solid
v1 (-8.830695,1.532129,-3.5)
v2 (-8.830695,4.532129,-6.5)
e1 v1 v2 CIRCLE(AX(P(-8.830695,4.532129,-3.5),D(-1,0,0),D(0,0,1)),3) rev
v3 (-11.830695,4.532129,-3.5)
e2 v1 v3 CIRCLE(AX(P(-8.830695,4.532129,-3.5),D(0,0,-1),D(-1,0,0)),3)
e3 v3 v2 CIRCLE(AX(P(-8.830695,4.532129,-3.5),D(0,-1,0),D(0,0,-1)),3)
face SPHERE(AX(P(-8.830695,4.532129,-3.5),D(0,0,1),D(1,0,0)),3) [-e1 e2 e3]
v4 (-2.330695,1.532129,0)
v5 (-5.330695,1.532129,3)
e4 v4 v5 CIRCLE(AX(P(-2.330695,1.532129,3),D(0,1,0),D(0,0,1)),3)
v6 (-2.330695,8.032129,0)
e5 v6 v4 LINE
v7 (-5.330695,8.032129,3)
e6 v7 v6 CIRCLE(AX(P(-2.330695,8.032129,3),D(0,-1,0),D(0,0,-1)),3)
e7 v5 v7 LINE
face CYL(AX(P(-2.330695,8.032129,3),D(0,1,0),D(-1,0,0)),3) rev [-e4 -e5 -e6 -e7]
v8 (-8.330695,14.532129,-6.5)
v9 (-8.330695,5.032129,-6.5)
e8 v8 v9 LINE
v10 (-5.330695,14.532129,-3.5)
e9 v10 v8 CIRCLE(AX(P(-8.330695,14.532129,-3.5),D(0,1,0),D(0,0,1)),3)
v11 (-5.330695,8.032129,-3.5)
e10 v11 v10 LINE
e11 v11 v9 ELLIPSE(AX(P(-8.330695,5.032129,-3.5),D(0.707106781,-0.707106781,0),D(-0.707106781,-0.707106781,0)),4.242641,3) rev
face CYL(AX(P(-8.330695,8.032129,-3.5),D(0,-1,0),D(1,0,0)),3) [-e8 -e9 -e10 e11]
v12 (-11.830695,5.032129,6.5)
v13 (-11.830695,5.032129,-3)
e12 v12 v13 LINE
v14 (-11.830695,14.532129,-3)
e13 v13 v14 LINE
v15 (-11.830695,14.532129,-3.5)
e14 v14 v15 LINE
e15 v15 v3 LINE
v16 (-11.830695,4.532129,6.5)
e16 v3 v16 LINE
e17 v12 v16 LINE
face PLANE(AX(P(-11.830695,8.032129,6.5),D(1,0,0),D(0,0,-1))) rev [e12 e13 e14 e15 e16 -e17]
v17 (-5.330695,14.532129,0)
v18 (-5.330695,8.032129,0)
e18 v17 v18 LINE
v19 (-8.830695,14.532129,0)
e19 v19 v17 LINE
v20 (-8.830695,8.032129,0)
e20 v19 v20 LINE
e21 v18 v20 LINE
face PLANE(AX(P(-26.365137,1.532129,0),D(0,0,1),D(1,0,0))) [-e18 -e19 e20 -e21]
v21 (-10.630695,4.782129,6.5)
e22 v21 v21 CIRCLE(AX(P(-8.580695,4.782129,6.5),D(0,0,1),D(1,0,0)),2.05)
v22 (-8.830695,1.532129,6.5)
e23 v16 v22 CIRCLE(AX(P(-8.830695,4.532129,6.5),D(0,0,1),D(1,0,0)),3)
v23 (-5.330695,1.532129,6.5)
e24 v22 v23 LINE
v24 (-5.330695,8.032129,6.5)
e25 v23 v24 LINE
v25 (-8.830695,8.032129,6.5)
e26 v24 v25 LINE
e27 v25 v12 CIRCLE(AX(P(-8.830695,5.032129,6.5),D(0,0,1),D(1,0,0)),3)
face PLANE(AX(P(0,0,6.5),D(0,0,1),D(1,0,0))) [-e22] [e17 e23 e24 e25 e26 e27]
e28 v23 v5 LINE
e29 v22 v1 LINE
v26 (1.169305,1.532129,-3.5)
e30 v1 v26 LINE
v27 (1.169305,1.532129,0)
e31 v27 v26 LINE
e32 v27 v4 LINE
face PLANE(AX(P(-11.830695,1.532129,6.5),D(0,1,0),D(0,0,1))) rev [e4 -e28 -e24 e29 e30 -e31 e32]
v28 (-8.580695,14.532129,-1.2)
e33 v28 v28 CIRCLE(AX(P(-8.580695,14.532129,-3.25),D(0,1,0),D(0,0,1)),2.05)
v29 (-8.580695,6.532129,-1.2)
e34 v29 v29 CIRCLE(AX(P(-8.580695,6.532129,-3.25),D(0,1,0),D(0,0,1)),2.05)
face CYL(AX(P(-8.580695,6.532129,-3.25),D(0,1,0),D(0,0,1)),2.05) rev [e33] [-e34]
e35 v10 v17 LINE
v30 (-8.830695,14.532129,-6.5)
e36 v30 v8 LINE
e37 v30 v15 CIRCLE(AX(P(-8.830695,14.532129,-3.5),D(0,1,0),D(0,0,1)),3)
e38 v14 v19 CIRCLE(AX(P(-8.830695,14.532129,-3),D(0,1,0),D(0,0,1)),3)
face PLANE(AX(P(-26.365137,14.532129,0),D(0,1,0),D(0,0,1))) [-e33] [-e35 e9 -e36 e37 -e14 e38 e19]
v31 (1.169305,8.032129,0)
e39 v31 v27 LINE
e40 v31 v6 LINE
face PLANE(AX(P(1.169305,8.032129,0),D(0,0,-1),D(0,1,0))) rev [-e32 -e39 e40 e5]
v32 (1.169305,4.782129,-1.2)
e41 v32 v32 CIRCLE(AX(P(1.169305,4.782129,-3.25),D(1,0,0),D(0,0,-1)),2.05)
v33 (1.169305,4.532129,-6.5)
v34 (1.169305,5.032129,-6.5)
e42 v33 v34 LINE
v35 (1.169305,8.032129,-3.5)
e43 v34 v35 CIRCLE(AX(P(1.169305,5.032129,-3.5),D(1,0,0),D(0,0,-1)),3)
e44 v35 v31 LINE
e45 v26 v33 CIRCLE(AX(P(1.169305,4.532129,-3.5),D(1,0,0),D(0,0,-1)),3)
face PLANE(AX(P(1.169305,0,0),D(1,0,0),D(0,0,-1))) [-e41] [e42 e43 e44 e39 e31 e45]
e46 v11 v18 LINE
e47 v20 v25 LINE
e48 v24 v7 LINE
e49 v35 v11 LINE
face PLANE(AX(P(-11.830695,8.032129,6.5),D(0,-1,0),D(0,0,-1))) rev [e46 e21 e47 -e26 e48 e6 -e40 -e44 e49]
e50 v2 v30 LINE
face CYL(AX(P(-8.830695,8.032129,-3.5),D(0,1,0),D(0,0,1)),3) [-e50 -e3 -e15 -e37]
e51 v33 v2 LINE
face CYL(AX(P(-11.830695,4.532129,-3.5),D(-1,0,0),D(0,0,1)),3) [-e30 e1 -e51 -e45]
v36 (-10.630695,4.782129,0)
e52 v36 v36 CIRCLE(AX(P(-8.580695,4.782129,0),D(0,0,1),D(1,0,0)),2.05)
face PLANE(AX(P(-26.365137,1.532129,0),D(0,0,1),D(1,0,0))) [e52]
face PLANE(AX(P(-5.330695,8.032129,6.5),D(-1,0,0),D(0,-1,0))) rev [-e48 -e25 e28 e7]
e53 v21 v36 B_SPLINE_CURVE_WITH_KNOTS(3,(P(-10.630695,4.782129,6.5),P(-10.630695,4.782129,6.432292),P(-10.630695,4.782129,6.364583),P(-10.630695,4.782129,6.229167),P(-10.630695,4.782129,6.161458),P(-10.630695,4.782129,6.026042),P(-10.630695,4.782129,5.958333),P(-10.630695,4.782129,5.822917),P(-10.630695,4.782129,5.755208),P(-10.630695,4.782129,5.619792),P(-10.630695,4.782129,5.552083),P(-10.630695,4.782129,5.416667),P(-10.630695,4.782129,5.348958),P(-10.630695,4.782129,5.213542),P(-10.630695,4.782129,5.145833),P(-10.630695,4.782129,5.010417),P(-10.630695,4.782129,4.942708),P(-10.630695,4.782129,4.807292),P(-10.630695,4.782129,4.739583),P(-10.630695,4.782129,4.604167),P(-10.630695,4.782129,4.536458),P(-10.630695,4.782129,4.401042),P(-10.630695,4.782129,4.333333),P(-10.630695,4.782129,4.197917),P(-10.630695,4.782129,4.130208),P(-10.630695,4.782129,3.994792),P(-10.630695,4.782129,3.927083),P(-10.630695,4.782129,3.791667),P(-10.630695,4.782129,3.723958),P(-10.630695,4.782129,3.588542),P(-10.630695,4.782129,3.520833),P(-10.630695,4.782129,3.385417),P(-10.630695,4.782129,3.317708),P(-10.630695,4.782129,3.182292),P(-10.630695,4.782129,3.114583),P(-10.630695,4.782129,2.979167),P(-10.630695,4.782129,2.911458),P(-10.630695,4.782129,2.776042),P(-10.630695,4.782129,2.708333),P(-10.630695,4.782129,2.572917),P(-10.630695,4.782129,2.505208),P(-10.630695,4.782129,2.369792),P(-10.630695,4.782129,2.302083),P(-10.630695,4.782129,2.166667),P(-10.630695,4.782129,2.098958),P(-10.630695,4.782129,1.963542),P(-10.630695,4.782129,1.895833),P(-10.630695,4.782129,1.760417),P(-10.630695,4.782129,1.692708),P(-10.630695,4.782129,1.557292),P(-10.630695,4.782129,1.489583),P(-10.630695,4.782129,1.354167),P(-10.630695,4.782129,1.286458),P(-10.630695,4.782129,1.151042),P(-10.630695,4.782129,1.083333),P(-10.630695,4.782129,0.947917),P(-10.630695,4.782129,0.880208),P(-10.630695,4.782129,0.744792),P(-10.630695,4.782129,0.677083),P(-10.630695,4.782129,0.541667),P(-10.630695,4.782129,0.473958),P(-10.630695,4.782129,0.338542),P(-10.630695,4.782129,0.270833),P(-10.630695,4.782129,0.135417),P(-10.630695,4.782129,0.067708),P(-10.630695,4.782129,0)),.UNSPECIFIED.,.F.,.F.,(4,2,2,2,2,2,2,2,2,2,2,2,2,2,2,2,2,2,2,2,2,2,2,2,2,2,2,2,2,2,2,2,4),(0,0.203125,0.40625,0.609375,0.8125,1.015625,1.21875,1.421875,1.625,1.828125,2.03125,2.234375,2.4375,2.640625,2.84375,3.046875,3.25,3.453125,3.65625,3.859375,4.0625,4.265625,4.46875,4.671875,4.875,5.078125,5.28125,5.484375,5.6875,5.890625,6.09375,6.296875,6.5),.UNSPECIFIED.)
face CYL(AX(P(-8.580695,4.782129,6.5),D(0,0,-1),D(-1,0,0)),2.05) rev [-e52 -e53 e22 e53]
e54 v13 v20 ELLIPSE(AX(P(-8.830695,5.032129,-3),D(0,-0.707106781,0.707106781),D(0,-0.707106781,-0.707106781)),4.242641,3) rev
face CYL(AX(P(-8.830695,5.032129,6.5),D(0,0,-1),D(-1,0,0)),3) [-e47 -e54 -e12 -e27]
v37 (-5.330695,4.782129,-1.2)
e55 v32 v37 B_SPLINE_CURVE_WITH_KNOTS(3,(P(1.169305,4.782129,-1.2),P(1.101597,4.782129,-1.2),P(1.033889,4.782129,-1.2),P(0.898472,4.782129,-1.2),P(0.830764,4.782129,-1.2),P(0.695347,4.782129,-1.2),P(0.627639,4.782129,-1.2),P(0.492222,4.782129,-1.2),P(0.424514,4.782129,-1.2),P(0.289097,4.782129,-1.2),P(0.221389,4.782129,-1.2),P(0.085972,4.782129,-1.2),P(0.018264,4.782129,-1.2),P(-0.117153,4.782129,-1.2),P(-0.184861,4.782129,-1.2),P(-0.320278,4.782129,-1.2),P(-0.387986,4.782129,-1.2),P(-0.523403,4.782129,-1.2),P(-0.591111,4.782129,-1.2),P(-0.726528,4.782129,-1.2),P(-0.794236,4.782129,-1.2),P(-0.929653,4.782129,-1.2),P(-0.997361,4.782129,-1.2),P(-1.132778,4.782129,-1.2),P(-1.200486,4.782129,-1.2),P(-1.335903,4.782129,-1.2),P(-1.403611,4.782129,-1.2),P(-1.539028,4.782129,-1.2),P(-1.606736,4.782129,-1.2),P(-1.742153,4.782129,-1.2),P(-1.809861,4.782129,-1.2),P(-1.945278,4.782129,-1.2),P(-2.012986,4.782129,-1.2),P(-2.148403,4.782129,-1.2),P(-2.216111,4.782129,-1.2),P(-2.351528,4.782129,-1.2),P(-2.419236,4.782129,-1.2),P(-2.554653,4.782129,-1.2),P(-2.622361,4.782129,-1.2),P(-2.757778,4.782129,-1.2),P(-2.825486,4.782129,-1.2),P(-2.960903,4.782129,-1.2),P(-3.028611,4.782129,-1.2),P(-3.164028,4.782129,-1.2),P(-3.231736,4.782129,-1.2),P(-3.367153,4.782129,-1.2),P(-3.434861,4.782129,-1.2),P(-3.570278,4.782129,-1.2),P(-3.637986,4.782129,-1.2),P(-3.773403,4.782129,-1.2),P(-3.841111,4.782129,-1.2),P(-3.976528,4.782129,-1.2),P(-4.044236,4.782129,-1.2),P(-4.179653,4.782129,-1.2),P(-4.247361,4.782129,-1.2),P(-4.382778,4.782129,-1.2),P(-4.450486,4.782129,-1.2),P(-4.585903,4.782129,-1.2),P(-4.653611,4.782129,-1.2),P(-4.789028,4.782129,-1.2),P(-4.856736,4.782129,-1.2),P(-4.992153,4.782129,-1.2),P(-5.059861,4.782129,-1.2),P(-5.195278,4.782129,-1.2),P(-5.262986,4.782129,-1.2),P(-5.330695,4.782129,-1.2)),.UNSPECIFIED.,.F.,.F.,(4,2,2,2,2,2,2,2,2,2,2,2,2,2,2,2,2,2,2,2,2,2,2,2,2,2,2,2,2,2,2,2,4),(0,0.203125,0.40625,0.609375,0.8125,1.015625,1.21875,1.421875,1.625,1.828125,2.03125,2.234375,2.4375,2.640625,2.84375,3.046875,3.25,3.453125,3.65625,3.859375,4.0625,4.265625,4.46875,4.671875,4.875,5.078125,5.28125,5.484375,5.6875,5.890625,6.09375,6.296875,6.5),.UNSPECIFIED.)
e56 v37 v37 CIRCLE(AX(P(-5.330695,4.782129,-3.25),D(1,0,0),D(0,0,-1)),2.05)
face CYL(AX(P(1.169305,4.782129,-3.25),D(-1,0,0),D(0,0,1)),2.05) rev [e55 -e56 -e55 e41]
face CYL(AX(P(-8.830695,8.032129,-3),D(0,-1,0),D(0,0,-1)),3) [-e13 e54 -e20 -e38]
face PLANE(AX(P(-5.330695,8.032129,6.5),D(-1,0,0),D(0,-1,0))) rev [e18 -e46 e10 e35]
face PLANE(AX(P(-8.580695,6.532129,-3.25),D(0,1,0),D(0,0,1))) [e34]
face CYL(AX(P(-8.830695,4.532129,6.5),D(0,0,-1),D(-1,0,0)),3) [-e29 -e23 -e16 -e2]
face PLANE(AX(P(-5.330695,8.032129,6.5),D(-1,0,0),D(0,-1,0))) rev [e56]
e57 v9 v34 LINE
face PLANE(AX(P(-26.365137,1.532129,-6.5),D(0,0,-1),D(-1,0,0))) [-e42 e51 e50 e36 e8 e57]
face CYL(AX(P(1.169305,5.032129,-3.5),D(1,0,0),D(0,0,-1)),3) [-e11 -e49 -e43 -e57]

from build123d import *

# Parameters (mm, degrees)
SKETCH_1_W          = 6.5
SKETCH_1_H          = 6.5
SKETCH_1_R          = 2.05
EXTRUDE_1_DEPTH     = 6.5
SKETCH_2_W          = 6.5
SKETCH_2_H          = 13
EXTRUDE_2_DEPTH     = 6.5
SKETCH_3_W          = 6.5
SKETCH_3_H          = 6.5
SKETCH_3_R          = 2.05
EXTRUDE_3_DEPTH     = 6.5
SKETCH_4_R          = 2.05
CUT_EXTRUDE_1_DEPTH = 8
FILLET_1_R          = 3
FILLET_2_R          = 3


with BuildPart() as part:
    # 草图1 → 凸台-拉伸1 (new body)
    with BuildSketch(Plane.XY):
        with Locations((-8.580694703, 4.782128964)):
            Rectangle(SKETCH_1_W, SKETCH_1_H)
        with Locations(Location((-8.580694703, 4.782128964, 0), (0, 0, 180))):
            Circle(SKETCH_1_R, mode=Mode.SUBTRACT)
    extrude(amount=EXTRUDE_1_DEPTH)

    # 草图2 → 凸台-拉伸2 (add)
    with BuildSketch(Plane(origin=(-5.330694703, 0, 0), x_dir=(0, 0, -1), z_dir=(1, 0, 0))):
        with Locations((3.25, 8.032128964)):
            Rectangle(SKETCH_2_W, SKETCH_2_H)
    extrude(amount=-EXTRUDE_2_DEPTH)

    # 草图3 → 凸台-拉伸3 (add)
    with BuildSketch(Plane(origin=(-5.330694703, 0, 0), x_dir=(0, 0, -1), z_dir=(1, 0, 0))):
        with Locations((3.25, 4.782128964)):
            Rectangle(SKETCH_3_W, SKETCH_3_H)
        with Locations(Location((3.25, 4.782128964, 0), (0, 0, 180))):
            Circle(SKETCH_3_R, mode=Mode.SUBTRACT)
    extrude(amount=EXTRUDE_3_DEPTH)

    # 草图4 → 切除-拉伸1 (cut)
    with BuildSketch(Plane(origin=(0, 14.532128964, 0), x_dir=(1, 0, 0), z_dir=(0, 1, 0))):
        with Locations(Location((-8.580694703, 3.25, 0), (0, 0, 270))):
            Circle(SKETCH_4_R)
    extrude(amount=-CUT_EXTRUDE_1_DEPTH, mode=Mode.SUBTRACT)

    # 圆角1
    fillet_1_edges = [part.edges().sort_by_distance(p)[0] for p in [
        (-5.330694703, 1.532128964, -6.5),
        (-11.830694703, 11.282128964, 0),
        (-11.830694703, 8.032128964, -6.5),
        (-5.330694703, 11.282128964, -6.5),
        (-2.080694703, 8.032128964, -6.5),
        (-11.830694703, 1.532128964, 0),
        (-11.830694703, 8.032128964, 3.25),
    ]]
    fillet(fillet_1_edges, radius=FILLET_1_R)

    # 圆角2
    # the kernel refuses this fillet: 3 mm, written as the material it adds along each edge
    with BuildSketch(Plane(origin=(-5.330694703, 1.532128964, 0), x_dir=(0, 0, 1), z_dir=(0, 1, 0))) as fillet_2_piece_1:
        with BuildLine():
            CenterArc((FILLET_2_R, FILLET_2_R), FILLET_2_R, 180, 90)
            Line((0, FILLET_2_R), (0, 0))
            Line((0, 0), (FILLET_2_R, 0))
        make_face()
    extrude(amount=6.5)


solid = part.part
